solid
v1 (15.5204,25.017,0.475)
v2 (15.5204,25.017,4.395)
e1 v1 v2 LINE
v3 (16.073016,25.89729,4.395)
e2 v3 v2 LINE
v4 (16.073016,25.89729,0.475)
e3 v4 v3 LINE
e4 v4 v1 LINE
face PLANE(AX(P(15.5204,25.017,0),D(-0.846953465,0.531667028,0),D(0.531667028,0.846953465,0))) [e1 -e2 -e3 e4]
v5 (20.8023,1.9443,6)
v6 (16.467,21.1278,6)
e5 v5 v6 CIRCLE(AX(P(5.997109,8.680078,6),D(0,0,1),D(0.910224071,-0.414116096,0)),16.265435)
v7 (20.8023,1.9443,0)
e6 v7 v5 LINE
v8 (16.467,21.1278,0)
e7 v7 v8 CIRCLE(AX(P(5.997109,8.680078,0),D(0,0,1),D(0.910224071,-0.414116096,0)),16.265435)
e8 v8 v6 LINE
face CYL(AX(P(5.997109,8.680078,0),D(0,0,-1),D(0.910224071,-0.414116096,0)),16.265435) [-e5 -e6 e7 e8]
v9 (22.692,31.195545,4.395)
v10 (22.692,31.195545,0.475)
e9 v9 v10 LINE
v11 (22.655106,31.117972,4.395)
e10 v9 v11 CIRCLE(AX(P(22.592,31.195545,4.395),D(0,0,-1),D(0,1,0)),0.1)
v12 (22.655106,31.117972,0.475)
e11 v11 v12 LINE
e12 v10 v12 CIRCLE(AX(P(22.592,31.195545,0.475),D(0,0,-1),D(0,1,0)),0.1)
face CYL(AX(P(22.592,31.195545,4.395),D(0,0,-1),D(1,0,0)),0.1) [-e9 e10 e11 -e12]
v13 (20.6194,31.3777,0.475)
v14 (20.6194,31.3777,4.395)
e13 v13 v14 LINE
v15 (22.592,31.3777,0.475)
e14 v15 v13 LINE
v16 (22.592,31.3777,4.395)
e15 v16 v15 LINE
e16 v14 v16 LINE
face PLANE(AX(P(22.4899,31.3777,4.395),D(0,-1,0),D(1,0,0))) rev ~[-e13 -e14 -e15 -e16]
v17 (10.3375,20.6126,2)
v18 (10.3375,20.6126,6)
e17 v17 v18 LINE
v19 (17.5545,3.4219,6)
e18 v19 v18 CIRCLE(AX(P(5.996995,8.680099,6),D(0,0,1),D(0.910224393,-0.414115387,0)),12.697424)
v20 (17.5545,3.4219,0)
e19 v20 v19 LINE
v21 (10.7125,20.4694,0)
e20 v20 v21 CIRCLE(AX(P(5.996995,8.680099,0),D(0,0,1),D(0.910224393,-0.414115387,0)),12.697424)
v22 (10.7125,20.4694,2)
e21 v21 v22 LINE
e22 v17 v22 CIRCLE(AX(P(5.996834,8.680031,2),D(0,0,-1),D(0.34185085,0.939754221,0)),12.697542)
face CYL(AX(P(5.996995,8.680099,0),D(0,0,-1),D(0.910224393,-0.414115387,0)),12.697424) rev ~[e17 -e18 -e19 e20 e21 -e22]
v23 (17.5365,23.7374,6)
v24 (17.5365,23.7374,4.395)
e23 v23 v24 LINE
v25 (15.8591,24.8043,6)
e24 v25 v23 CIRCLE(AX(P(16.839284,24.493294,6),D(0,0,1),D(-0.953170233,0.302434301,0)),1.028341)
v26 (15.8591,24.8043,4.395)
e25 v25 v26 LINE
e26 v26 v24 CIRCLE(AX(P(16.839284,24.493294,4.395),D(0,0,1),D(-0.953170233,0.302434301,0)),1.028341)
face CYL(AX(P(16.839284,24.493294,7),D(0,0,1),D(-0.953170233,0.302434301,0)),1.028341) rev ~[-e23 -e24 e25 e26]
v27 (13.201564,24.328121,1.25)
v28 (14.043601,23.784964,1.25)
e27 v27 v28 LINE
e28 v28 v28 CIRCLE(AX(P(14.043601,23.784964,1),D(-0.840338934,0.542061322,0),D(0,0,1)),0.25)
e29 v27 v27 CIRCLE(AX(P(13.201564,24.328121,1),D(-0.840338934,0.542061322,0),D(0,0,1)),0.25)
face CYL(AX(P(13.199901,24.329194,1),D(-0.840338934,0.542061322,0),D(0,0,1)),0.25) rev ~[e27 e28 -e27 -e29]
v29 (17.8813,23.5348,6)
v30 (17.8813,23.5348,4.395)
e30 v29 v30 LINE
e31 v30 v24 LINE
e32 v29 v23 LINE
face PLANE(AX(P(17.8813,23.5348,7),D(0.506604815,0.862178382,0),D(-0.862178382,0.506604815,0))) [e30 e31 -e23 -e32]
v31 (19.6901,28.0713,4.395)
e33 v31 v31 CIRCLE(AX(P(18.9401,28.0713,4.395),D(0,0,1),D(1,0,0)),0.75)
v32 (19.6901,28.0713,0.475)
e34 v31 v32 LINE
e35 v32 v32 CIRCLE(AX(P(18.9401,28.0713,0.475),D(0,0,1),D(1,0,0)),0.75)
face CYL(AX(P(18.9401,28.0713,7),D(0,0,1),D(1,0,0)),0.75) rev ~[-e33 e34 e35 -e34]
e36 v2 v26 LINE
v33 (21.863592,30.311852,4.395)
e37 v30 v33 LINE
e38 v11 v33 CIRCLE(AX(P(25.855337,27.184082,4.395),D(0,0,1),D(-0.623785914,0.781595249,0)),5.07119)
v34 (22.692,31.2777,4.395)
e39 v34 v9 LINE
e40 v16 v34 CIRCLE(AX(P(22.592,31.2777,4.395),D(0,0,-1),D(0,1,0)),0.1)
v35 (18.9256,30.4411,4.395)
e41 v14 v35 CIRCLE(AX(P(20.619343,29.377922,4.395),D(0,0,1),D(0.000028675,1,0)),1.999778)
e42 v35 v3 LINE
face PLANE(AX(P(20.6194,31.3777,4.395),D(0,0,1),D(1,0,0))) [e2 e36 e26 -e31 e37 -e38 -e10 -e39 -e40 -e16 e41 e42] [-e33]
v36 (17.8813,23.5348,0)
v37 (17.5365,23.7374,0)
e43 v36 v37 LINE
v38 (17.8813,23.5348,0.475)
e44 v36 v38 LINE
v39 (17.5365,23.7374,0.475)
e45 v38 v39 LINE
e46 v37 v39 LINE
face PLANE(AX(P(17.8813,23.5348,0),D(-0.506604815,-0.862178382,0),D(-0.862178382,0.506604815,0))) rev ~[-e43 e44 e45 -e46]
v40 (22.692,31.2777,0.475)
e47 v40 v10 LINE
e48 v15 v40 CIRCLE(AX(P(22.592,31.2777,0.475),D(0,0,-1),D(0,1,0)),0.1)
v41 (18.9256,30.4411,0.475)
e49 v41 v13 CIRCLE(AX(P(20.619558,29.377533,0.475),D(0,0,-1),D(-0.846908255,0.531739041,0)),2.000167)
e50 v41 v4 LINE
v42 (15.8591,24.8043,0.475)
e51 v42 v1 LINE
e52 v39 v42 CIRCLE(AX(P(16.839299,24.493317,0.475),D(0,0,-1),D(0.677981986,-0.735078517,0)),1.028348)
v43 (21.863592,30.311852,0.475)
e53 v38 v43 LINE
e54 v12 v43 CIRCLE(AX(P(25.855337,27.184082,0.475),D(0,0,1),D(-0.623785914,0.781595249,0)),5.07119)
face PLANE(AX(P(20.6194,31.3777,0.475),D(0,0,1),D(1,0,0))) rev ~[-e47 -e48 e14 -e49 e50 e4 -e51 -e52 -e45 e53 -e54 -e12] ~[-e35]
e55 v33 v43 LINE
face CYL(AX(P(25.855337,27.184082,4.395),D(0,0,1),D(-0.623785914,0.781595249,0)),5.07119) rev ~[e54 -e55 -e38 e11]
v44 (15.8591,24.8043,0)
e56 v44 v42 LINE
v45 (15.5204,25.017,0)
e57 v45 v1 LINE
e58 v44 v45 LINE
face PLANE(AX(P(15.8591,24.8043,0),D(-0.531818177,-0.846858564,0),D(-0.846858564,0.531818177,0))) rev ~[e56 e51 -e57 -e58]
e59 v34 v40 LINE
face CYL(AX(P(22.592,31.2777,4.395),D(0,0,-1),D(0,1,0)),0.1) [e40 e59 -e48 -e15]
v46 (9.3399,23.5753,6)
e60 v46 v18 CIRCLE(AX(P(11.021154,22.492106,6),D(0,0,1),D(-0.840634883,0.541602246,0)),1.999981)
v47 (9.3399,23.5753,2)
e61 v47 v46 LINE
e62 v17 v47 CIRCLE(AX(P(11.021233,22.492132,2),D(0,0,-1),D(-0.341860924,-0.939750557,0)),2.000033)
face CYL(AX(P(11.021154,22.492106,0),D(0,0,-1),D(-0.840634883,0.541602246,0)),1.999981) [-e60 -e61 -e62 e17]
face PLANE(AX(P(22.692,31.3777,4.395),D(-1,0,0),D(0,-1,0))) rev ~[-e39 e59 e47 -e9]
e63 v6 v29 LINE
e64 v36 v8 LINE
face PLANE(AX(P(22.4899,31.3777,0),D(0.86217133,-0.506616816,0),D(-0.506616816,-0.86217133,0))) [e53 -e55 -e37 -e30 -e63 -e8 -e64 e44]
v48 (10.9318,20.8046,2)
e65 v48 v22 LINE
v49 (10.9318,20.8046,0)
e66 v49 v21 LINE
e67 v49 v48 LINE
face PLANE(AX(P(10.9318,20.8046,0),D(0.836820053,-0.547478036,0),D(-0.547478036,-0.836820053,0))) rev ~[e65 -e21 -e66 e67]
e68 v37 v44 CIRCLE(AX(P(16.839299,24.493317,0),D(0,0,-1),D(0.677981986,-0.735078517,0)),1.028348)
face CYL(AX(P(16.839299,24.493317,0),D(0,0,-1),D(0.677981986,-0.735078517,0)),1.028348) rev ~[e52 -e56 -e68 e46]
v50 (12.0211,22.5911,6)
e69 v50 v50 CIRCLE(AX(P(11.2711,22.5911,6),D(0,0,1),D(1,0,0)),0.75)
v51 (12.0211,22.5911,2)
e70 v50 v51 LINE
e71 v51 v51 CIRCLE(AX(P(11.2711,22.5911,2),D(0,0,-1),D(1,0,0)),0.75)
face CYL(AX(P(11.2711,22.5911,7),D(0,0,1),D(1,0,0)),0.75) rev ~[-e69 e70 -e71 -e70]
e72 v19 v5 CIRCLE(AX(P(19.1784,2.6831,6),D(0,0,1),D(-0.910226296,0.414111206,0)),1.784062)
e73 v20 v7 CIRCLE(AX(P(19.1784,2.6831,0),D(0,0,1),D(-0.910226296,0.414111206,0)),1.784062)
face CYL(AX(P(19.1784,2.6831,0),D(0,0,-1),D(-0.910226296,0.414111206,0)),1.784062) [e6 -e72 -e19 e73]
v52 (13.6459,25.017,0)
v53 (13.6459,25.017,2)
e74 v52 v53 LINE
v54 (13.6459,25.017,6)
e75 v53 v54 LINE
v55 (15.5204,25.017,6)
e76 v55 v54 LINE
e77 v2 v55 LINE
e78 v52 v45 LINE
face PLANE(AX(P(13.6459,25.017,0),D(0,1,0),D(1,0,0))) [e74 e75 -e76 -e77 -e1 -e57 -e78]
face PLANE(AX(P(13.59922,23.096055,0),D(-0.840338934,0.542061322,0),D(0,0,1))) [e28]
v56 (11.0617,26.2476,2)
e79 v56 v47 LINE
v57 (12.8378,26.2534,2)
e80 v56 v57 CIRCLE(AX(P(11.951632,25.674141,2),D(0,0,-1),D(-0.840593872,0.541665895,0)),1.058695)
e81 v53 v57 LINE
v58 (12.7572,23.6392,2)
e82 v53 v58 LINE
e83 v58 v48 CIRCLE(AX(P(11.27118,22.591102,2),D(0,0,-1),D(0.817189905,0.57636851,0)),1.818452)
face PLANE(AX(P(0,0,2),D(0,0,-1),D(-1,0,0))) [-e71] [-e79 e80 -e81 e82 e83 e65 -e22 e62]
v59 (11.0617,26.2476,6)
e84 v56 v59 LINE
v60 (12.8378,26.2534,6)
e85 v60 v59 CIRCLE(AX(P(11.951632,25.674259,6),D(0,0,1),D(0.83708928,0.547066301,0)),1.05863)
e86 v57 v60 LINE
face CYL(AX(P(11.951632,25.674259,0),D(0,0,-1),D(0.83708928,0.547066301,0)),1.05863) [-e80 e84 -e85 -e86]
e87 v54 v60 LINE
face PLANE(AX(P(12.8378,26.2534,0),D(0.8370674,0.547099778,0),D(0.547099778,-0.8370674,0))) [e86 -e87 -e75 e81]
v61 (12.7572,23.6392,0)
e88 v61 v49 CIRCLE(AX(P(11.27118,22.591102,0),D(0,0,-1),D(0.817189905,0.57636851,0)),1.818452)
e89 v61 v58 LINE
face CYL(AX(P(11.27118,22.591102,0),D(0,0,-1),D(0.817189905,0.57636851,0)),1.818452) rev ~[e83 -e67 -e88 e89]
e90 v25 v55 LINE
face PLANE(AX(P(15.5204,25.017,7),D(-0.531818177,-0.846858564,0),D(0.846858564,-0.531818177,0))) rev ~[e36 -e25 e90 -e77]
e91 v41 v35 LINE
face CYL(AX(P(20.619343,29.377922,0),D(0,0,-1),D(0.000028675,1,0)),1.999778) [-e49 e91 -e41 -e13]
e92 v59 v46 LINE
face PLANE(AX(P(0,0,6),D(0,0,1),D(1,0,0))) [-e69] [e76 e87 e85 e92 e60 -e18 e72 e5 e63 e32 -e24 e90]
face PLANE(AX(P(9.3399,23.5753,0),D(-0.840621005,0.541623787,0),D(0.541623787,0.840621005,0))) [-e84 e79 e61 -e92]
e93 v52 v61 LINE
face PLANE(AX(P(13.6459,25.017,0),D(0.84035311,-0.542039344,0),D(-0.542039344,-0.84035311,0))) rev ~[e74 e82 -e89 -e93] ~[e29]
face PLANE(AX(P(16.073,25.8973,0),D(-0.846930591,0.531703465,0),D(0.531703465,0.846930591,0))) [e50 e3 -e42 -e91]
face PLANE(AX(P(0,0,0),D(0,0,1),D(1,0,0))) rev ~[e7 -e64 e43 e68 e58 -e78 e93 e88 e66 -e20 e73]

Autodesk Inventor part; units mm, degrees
ref_plane "YZ Plane" through (0, 0, 0) normal (1, 0, 0) x (0, 1, 0)
ref_plane "XZ Plane" through (0, 0, 0) normal (0, 1, 0) x (-1, 0, 0)
ref_plane "XY Plane" through (0, 0, 0) normal (0, 0, 1) x (1, 0, 0)
sketch "Sketch1" plane through (0, 0, 0) normal (0, 0, 1) x (1, 0, 0)
  line L0 (20.6194, 31.3777) -> (22.4899, 31.3777)
  line L1 (22.4899, 31.3777) -> (16.467, 21.1278)
  arc A0 (20.8023, 1.9443) -> (16.467, 21.1278) centre (5.9969, 8.6801) ccw
  line L2 (16.073, 25.8973) -> (18.9256, 30.4411)
  arc A1 (20.6194, 31.3777) -> (18.9256, 30.4411) centre (20.6194, 29.3777) ccw
  line L3 (13.6459, 25.017) -> (15.5204, 25.017)
  line L4 (15.5204, 25.017) -> (16.073, 25.8973)
  arc A2 (17.5545, 3.4219) -> (20.8023, 1.9443) centre (19.1784, 2.6831) ccw
  arc A3 (17.5545, 3.4219) -> (10.3375, 20.6126) centre (5.9969, 8.6801) ccw
  line L5 (9.3399, 23.5753) -> (11.0617, 26.2476)
  line L6 (12.8378, 26.2534) -> (13.6459, 25.017)
  arc A4 (9.3399, 23.5753) -> (10.3375, 20.6126) centre (11.0212, 22.4921) ccw
  arc A5 (12.8378, 26.2534) -> (11.0617, 26.2476) centre (11.9516, 25.6742) ccw
  point P0 (0, 0)
  point P1 (7.8374, 21.2434)
  dimension "d6" = 2
  dimension "d53" = 2
extrude "Extrusion12" add sketch "Sketch1" along normal blind 7
sketch "Sketch14" plane through (0, 0, 7) normal (0, 0, 1) x (1, 0, 0)
  circle A0 centre (11.2711, 22.5911) radius 0.75
  circle A1 centre (18.9401, 28.0713) radius 0.75
  point P0 (0, 0)
  dimension "d56" = 1.5
  dimension "d57" = 1.5
extrude "Extrusion13" cut sketch "Sketch14" against normal through all
sketch "Sketch15" plane through (0, 0, 0) normal (0, 0, -1) x (-1, 0, 0)
  arc A0 (-12.7572, 23.6392) -> (-10.9318, 20.8046) centre (-11.2711, 22.5911) ccw
  circle A1 centre (-18.9401, 28.0713) radius 0.75 projected
  circle A2 centre (-11.2711, 22.5911) radius 0.75 projected
  line L0 (-22.4899, 31.3777) -> (-20.6194, 31.3777) projected
  line L1 (-16.467, 21.1278) -> (-22.4899, 31.3777) projected
  arc A3 (-16.467, 21.1278) -> (-20.8023, 1.9443) centre (-5.9969, 8.6801) ccw projected
  arc A4 (-20.8023, 1.9443) -> (-17.5545, 3.4219) centre (-19.1784, 2.6831) ccw projected
  arc A5 (-10.3375, 20.6126) -> (-17.5545, 3.4219) centre (-5.9969, 8.6801) ccw projected
  arc A6 (-10.3375, 20.6126) -> (-9.3399, 23.5753) centre (-11.0212, 22.4921) ccw projected
  line L2 (-11.0617, 26.2476) -> (-9.3399, 23.5753) projected
  arc A7 (-11.0617, 26.2476) -> (-12.8378, 26.2534) centre (-11.9516, 25.6742) ccw projected
  line L3 (-13.6459, 25.017) -> (-12.8378, 26.2534) projected
  line L4 (-15.5204, 25.017) -> (-13.6459, 25.017) projected
  line L5 (-18.9256, 30.4411) -> (-15.5204, 25.017) projected
  arc A8 (-18.9256, 30.4411) -> (-20.6194, 31.3777) centre (-20.6194, 29.3777) ccw projected
  line L6 (-10.9318, 20.8046) -> (-10.7125, 20.4694)
  arc A9 (-10.3375, 20.6126) -> (-17.5545, 3.4219) centre (-5.9969, 8.6801) ccw projected
  line L7 (-13.6459, 25.017) -> (-12.7572, 23.6392)
  point P0 (0, 0)
extrude "Extrusion17" cut sketch "Sketch15" against normal blind 2 contours L7 L3 A7 L2 A6 A5 L6 A0
sketch "Sketch18" plane through (0, 0, 7) normal (0, 0, 1) x (1, 0, 0)
  circle A0 centre (18.9401, 28.0713) radius 0.75 projected
  circle A1 centre (11.2711, 22.5911) radius 0.75 projected
  line L0 (22.4899, 31.3777) -> (20.6194, 31.3777) projected
  arc A2 (20.6194, 31.3777) -> (18.9256, 30.4411) centre (20.6194, 29.3777) ccw projected
  line L1 (18.9256, 30.4411) -> (15.5204, 25.017) projected
  line L2 (15.5204, 25.017) -> (13.6459, 25.017) projected
  line L3 (13.6459, 25.017) -> (12.8378, 26.2534) projected
  arc A3 (12.8378, 26.2534) -> (11.0617, 26.2476) centre (11.9516, 25.6742) ccw projected
  line L4 (11.0617, 26.2476) -> (9.3399, 23.5753) projected
  arc A4 (9.3399, 23.5753) -> (10.3375, 20.6126) centre (11.0212, 22.4921) ccw projected
  arc A5 (17.5545, 3.4219) -> (10.3375, 20.6126) centre (5.9969, 8.6801) ccw projected
  arc A6 (17.5545, 3.4219) -> (20.8023, 1.9443) centre (19.1784, 2.6831) ccw projected
  arc A7 (20.8023, 1.9443) -> (16.467, 21.1278) centre (5.9969, 8.6801) ccw projected
  line L5 (16.467, 21.1278) -> (22.4899, 31.3777) projected
  line L6 (16.467, 21.1278) -> (22.4899, 31.3777) projected
  line L7 (15.5204, 25.017) -> (15.8591, 24.8043)
  line L8 (17.8813, 23.5348) -> (17.5365, 23.7374)
  arc A8 (15.8591, 24.8043) -> (17.5365, 23.7374) centre (16.8393, 24.4933) ccw
  point P0 (0, 0)
  dimension "d75" = 0.4
  dimension "d76" = 0.4
extrude "Extrusion18" cut sketch "Sketch18" against normal blind 2.605 contours L5 L8 A8 L7 L1 A2 L0
sketch "Sketch19" plane through (12.7572, 23.6392, 0) normal (-0.8403389, 0.5420613, 0) x (0, 0, 1)
  line L0 (0, 0) -> (0, 1.6395) projected
  line L1 (0, 0) -> (2, 0) projected
  line L2 (2, 0) -> (2, 1.6395) projected
  line L3 (0, 1.6395) -> (2, 1.6395) projected
  circle A0 centre (1, 0.8198) radius 0.25
  line L4 (0, 0) -> (2, 0) projected
  line L5 (2, 1.6395) -> (0, 0)
  line L6 (0, 0) -> (0, 1.6395)
  line L7 (2, 0) -> (0, 1.6395)
  point P0 (0, -26.7801)
  dimension "d79" = 0.5
extrude "Extrusion19" cut sketch "Sketch19" against normal blind 1 contours L5 L7 A0 | A0 L7 L5 | A0 L5 L7 | L7 L5 A0
sketch "Sketch20" plane through (22.4899, 31.3777, 0) normal (0, 0, -1) x (-1, 0, 0)
  line L0 (11.7774, -10.9083) -> (11.5581, -10.5731) projected
  arc A0 (9.7327, -7.7385) -> (11.5581, -10.5731) centre (11.2188, -8.7866) ccw projected
  line L1 (9.7327, -7.7385) -> (8.844, -6.3607) projected
  line L2 (6.9695, -6.3607) -> (8.844, -6.3607) projected
  line L3 (3.5643, -0.9366) -> (6.9695, -6.3607) projected
  arc A1 (3.5643, -0.9366) -> (1.8705, 0) centre (1.8705, -2) ccw projected
  line L4 (0, 0) -> (1.8705, 0) projected
  line L5 (6.0229, -10.2499) -> (0, 0) projected
  arc A2 (6.0229, -10.2499) -> (1.6876, -29.4334) centre (16.493, -22.6976) ccw projected
  arc A3 (1.6876, -29.4334) -> (4.9355, -27.9558) centre (3.3115, -28.6946) ccw projected
  arc A4 (11.7774, -10.9083) -> (4.9355, -27.9558) centre (16.493, -22.6976) ccw projected
  circle A5 centre (3.5498, -3.3064) radius 0.75 projected
  line L6 (6.6308, -6.5734) -> (6.9695, -6.3607) projected
  arc A6 (4.9534, -7.6403) -> (6.6308, -6.5734) centre (5.6506, -6.8844) ccw projected
  line L7 (4.6086, -7.8429) -> (4.9534, -7.6403) projected
  point P0 (22.4899, -31.3777)
extrude "Extrusion20" cut sketch "Sketch20" against normal blind 0.475 contours L6 A6 L7 L5 L4 A1 L3
sketch "Sketch22" plane through (20.6194, 31.3777, 4.395) normal (0, 0, 1) x (1, 0, 0)
  circle A0 centre (-1.6793, -3.3064) radius 0.75 projected
  line L0 (0, 0) -> (1.8705, 0) projected
  arc A1 (0, 0) -> (-1.6939, -0.9366) centre (0, -2) ccw projected
  line L1 (-5.0991, -6.3607) -> (-1.6939, -0.9366) projected
  line L2 (-4.7603, -6.5734) -> (-5.0991, -6.3607) projected
  arc A2 (-4.7603, -6.5734) -> (-3.083, -7.6403) centre (-3.7801, -6.8844) ccw projected
  line L3 (-2.7381, -7.8429) -> (-3.083, -7.6403) projected
  line L4 (1.8705, 0) -> (-2.7381, -7.8429) projected
  line L5 (0, 0) -> (2.0726, 0)
  line L6 (2.0726, 0) -> (2.0726, -0.23)
  arc A3 (2.0726, -0.23) -> (0.5611, -2.2282) centre (5.2352, -4.1929) ccw
  point P0 (-20.6194, -31.3777)
  point P1 (1.2441, -1.066)
  dimension "d99" = 0.23
extrude "Extrusion22" add sketch "Sketch22" against normal up to surface (3.92 mm away) contours L5 L6 A3 L4
fillet "Fillet8" radius 0.1 2 edges at (22.6921, 31.1477, 2.435) (22.6921, 31.3777, 2.435)
sketch "Sketch23" plane through (0, 0, 7) normal (0, 0, 1) x (1, 0, 0)
  line L0 (15.8591, 24.8043) -> (15.5204, 25.017) projected
  line L1 (15.5204, 25.017) -> (13.6459, 25.017) projected
  line L2 (13.6459, 25.017) -> (12.8378, 26.2534) projected
  arc A0 (12.8378, 26.2534) -> (11.0617, 26.2476) centre (11.9516, 25.6742) ccw projected
  line L3 (11.0617, 26.2476) -> (9.3399, 23.5753) projected
  arc A1 (9.3399, 23.5753) -> (10.3375, 20.6126) centre (11.0212, 22.4921) ccw projected
  arc A2 (17.5545, 3.4219) -> (10.3375, 20.6126) centre (5.9969, 8.6801) ccw projected
  arc A3 (17.5545, 3.4219) -> (20.8023, 1.9443) centre (19.1784, 2.6831) ccw projected
  arc A4 (20.8023, 1.9443) -> (16.467, 21.1278) centre (5.9969, 8.6801) ccw projected
  line L4 (16.467, 21.1278) -> (17.8813, 23.5348) projected
  line L5 (17.8813, 23.5348) -> (17.5365, 23.7374) projected
  arc A5 (15.8591, 24.8043) -> (17.5365, 23.7374) centre (16.8393, 24.4933) ccw projected
  circle A6 centre (11.2711, 22.5911) radius 0.75 projected
  point P0 (0, 0)
extrude "Extrusion23" cut sketch "Sketch23" against normal blind 1
properties material "Nickel-Copper Alloy 400"
